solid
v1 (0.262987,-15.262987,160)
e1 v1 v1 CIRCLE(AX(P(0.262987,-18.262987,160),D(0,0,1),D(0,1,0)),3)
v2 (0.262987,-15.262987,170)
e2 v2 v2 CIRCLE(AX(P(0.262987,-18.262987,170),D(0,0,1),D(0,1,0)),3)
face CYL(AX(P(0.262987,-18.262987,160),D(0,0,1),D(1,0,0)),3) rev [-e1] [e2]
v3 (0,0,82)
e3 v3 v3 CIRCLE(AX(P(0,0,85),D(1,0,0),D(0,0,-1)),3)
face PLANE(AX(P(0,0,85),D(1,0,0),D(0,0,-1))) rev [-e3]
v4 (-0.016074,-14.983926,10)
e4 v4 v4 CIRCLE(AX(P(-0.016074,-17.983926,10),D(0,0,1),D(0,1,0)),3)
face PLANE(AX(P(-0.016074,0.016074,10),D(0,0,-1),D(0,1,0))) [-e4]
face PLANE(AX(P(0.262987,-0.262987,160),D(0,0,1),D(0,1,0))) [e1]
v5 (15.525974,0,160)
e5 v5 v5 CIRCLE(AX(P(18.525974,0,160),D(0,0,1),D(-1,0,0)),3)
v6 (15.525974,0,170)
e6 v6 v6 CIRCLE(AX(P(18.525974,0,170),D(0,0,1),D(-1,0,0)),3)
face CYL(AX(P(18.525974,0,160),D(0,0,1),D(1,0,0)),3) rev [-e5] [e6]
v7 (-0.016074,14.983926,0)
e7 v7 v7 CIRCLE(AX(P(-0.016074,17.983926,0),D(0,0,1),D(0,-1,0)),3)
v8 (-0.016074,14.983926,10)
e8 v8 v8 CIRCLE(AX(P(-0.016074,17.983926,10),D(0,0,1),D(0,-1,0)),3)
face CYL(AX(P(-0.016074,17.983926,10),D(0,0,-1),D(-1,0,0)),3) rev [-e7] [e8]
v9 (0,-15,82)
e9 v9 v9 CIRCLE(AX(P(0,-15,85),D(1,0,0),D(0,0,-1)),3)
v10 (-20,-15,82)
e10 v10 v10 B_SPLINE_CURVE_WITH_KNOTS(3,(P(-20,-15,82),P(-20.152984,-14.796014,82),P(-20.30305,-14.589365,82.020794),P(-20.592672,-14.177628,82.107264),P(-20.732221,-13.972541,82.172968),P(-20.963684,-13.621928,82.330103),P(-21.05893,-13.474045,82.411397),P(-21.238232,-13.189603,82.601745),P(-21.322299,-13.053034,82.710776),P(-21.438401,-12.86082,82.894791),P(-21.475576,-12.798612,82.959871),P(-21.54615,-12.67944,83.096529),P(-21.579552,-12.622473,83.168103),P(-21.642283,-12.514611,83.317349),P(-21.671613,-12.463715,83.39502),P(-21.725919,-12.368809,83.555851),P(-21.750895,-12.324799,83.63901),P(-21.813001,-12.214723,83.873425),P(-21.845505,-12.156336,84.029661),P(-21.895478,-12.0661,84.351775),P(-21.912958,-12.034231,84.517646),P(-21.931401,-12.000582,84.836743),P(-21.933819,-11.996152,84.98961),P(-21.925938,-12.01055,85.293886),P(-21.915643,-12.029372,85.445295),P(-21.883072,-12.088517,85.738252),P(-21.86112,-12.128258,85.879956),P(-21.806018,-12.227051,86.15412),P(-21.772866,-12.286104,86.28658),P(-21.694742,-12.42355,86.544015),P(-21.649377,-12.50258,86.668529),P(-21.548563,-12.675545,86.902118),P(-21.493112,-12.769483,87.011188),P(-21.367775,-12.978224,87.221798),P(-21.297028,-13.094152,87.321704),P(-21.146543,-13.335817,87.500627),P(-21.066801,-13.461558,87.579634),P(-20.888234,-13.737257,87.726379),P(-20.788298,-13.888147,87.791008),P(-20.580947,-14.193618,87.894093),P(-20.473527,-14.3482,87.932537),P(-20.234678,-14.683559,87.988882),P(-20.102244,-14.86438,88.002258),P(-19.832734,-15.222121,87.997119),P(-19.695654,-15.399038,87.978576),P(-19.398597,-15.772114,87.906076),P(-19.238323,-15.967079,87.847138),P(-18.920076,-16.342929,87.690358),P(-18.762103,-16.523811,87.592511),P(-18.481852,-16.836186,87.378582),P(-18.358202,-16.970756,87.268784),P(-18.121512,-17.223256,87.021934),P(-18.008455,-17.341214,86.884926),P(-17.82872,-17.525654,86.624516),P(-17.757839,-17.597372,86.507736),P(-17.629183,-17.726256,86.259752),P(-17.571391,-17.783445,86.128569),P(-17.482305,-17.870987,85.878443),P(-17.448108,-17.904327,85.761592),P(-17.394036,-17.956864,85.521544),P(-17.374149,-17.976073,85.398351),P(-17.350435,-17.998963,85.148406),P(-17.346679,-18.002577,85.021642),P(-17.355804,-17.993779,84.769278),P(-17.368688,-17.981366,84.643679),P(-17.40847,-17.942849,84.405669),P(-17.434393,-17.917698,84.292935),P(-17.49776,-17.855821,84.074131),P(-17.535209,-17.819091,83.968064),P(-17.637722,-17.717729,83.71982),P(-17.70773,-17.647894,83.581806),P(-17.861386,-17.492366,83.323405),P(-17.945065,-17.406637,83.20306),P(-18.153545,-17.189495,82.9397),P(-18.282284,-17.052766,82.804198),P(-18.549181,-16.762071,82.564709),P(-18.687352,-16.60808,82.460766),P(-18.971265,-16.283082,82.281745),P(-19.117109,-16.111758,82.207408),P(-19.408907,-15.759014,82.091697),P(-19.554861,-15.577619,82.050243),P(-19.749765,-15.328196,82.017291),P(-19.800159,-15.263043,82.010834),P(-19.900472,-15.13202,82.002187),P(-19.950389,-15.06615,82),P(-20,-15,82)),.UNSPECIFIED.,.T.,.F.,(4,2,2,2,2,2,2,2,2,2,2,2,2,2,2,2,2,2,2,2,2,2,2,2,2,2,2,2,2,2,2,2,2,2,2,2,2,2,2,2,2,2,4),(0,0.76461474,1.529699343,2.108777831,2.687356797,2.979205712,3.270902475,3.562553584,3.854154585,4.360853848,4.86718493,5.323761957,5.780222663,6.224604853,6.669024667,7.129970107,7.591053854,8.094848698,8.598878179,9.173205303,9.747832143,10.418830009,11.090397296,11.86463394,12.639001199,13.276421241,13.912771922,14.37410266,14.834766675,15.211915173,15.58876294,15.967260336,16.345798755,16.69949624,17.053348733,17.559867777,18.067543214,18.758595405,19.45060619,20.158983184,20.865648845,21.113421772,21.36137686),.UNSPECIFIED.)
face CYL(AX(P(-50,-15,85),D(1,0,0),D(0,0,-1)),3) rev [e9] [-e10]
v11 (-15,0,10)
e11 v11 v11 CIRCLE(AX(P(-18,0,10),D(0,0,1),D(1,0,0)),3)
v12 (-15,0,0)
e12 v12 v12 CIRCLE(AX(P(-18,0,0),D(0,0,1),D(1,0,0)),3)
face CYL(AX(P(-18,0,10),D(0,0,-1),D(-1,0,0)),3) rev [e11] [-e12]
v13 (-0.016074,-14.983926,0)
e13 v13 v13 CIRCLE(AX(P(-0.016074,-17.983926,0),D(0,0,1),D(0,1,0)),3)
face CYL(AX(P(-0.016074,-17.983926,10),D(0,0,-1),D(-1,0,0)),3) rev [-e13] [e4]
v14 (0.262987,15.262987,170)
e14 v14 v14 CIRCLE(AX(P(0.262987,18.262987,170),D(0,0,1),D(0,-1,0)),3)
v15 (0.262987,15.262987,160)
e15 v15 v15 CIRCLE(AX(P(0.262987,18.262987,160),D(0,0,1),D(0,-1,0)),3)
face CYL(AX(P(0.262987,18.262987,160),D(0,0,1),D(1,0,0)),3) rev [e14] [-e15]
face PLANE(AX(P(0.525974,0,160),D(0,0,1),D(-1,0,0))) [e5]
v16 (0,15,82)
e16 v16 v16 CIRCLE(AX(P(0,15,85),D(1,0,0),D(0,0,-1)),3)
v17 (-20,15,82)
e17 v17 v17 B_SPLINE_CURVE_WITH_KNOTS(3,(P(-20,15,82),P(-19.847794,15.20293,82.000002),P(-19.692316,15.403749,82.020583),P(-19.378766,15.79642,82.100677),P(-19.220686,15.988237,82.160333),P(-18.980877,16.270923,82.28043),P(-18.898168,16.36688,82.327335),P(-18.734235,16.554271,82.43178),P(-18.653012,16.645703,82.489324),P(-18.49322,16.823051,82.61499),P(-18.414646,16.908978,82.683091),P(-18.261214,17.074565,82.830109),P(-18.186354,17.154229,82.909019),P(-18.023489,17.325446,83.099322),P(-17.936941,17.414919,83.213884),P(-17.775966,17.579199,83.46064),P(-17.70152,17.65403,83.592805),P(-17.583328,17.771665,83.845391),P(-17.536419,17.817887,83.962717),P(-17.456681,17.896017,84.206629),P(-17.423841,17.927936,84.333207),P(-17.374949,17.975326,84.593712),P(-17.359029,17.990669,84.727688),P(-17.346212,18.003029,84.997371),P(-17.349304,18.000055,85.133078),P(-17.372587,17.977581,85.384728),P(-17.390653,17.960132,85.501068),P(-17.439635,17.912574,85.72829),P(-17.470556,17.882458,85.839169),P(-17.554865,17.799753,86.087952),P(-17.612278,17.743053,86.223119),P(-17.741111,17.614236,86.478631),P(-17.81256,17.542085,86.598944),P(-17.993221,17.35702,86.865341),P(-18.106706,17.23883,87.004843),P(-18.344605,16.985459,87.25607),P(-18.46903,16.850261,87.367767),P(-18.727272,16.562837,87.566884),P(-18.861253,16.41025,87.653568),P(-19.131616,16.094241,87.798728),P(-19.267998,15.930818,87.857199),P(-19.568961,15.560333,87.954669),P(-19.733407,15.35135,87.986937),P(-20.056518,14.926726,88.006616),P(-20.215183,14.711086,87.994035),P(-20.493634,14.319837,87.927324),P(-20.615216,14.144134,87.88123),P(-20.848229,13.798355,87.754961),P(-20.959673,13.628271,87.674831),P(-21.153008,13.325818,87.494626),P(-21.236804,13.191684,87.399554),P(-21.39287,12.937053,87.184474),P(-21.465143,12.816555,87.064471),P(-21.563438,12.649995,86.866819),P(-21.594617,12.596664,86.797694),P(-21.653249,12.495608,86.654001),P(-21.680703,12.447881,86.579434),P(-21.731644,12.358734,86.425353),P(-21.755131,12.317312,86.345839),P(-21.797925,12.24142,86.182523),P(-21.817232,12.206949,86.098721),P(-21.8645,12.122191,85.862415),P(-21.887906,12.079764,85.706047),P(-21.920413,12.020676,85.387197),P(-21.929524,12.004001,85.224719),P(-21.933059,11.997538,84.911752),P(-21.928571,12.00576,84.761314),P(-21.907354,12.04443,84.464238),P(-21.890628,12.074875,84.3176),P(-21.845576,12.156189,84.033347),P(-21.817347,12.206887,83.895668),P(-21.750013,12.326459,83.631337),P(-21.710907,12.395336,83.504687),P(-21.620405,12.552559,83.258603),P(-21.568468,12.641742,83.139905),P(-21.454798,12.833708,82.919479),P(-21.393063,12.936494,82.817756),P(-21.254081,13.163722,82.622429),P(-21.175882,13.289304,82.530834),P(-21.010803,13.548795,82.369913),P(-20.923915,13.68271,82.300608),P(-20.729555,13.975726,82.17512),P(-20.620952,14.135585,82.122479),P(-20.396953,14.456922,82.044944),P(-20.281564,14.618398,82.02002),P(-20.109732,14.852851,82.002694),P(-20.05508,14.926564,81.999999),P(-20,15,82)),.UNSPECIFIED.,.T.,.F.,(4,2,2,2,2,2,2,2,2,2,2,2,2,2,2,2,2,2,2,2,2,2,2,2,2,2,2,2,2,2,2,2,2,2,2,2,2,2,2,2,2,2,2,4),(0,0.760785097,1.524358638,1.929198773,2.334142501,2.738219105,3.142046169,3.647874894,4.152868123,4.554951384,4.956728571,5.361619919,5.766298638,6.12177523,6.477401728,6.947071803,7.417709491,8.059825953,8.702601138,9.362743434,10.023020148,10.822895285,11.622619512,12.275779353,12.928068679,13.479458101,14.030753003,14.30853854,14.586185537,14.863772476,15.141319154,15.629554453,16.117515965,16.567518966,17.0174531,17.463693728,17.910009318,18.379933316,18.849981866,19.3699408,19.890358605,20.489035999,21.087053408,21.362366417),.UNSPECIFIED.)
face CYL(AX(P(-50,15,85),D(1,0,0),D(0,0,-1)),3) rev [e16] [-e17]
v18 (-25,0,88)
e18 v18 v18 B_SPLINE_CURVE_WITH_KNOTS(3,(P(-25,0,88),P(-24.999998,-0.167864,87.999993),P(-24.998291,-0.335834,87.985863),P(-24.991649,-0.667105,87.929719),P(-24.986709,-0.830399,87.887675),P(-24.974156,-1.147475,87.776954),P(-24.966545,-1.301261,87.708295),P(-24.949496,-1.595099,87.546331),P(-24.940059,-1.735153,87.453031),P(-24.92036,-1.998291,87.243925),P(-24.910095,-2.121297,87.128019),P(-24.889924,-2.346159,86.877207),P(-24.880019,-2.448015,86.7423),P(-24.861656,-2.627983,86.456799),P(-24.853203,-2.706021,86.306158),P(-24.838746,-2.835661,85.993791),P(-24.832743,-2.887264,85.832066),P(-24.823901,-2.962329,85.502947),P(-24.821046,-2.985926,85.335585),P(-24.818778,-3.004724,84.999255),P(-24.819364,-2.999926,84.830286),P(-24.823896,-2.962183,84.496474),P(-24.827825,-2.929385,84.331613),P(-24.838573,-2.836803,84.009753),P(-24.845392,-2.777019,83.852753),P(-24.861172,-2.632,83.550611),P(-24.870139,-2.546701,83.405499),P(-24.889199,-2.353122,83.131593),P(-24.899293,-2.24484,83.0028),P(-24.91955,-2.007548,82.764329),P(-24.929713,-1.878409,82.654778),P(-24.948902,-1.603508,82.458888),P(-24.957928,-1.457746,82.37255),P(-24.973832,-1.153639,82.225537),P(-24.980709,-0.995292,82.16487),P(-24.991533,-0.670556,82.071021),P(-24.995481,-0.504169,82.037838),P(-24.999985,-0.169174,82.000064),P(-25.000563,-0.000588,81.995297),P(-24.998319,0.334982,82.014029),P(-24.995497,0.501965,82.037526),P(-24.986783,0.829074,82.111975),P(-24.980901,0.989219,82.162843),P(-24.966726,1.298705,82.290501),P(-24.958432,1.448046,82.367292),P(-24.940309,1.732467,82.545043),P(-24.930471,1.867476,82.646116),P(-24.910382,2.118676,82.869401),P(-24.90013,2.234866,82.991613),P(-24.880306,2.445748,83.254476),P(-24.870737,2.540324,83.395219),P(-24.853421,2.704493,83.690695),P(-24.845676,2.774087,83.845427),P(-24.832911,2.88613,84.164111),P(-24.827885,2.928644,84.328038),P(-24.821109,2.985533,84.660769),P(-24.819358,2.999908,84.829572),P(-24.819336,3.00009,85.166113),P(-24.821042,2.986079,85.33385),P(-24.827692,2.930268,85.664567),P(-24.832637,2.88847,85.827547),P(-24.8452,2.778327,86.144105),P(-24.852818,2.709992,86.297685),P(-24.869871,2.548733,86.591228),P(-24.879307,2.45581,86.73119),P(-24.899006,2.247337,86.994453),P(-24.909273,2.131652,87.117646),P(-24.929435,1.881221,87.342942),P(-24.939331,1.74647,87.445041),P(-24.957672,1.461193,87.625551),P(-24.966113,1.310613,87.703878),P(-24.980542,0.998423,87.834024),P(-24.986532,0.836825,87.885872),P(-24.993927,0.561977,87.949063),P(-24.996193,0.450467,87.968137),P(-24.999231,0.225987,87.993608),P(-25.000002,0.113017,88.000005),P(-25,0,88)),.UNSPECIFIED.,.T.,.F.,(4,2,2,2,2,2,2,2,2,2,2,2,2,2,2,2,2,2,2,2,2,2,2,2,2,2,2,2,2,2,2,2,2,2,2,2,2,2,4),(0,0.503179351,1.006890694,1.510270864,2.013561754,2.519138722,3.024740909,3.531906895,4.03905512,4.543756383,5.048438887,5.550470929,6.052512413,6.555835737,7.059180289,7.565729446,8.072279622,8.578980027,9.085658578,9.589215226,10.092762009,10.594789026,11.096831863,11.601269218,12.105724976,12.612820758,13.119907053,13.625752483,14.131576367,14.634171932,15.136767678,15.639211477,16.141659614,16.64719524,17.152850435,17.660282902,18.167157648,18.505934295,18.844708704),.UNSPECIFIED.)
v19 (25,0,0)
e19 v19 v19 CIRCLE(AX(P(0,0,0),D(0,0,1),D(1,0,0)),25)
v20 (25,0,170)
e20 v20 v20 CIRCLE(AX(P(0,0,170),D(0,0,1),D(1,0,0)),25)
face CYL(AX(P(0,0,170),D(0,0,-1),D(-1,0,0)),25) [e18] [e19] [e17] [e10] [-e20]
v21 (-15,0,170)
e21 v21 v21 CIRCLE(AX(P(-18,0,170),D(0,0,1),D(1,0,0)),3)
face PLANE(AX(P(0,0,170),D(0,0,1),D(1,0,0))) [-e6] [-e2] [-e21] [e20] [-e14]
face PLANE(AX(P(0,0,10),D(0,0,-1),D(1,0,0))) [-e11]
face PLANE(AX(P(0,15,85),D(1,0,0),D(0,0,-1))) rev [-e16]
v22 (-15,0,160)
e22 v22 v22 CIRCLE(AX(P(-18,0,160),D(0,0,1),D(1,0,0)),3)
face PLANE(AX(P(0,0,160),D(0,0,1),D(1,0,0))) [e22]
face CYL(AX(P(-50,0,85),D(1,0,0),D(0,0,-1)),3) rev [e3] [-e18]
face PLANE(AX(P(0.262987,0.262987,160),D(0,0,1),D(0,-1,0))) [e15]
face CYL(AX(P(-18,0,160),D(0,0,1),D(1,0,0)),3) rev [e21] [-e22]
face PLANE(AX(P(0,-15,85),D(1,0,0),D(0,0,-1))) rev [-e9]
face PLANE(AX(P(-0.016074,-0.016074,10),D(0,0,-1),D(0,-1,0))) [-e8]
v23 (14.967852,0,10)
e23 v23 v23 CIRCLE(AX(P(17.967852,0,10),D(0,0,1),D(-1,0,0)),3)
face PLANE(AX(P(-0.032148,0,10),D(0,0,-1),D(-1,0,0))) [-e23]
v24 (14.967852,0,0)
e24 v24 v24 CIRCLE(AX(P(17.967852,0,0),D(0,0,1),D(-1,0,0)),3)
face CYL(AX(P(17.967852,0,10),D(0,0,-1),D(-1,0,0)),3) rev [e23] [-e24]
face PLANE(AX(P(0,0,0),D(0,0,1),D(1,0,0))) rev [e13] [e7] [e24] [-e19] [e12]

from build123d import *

# Parameters (mm, degrees)
SKETCH_1_R               = 25
EXTRUDE_2_DEPTH          = 170
SKETCH_2_R               = 3
CUT_EXTRUDE_1_DEPTH      = 10
PATTERN_CIRCULAR_1_COUNT = 4
MIRROR_1_OUTLINE_R       = 3
MIRROR_1_DEPTH           = 10
SKETCH_3_R               = 3
CUT_EXTRUDE_2_DEPTH      = 50


# Read off the part's stored shape, not the designer's step: 镜向1
with BuildPart() as part:
    # 草图1 → 凸台-拉伸2 (new body)
    with BuildSketch(Plane.XY):
        Circle(SKETCH_1_R)
    extrude(amount=EXTRUDE_2_DEPTH)

    # 草图2 → 切除-拉伸1 (cut)
    with BuildSketch(Plane.XY.offset(170)):
        with Locations((-18, 0)):
            Circle(SKETCH_2_R)
    cut_extrude_1 = extrude(amount=-CUT_EXTRUDE_1_DEPTH, mode=Mode.SUBTRACT)

    # 阵列(圆周)1: 切除-拉伸1 ×4 about axis
    pattern_circular_1_axis = Axis((0.262987013, 0, 0), (0, 0, 1))
    for i in range(1, PATTERN_CIRCULAR_1_COUNT):
        add(cut_extrude_1.rotate(pattern_circular_1_axis, i * 360 / PATTERN_CIRCULAR_1_COUNT), mode=Mode.SUBTRACT)

    # 镜向1 outline → 镜向1 (cut)
    with BuildSketch(Plane.XY):
        with Locations((-18, 0)):
            Circle(MIRROR_1_OUTLINE_R)
        with Locations((-0.016073909, 17.983926091)):
            Circle(MIRROR_1_OUTLINE_R)
        with Locations((17.967852182, 0)):
            Circle(MIRROR_1_OUTLINE_R)
        with Locations((-0.016073909, -17.983926091)):
            Circle(MIRROR_1_OUTLINE_R)
    extrude(amount=MIRROR_1_DEPTH, mode=Mode.SUBTRACT)

    # 草图3 → 切除-拉伸2 (cut)
    with BuildSketch(Plane(origin=(0, 0, 0), x_dir=(0, 0, -1), z_dir=(1, 0, 0))):
        with Locations((-85, 0)):
            Circle(SKETCH_3_R)
        with Locations((-85, 15)):
            Circle(SKETCH_3_R)
        with Locations((-85, -15)):
            Circle(SKETCH_3_R)
    extrude(amount=-CUT_EXTRUDE_2_DEPTH, mode=Mode.SUBTRACT)


solid = part.part
